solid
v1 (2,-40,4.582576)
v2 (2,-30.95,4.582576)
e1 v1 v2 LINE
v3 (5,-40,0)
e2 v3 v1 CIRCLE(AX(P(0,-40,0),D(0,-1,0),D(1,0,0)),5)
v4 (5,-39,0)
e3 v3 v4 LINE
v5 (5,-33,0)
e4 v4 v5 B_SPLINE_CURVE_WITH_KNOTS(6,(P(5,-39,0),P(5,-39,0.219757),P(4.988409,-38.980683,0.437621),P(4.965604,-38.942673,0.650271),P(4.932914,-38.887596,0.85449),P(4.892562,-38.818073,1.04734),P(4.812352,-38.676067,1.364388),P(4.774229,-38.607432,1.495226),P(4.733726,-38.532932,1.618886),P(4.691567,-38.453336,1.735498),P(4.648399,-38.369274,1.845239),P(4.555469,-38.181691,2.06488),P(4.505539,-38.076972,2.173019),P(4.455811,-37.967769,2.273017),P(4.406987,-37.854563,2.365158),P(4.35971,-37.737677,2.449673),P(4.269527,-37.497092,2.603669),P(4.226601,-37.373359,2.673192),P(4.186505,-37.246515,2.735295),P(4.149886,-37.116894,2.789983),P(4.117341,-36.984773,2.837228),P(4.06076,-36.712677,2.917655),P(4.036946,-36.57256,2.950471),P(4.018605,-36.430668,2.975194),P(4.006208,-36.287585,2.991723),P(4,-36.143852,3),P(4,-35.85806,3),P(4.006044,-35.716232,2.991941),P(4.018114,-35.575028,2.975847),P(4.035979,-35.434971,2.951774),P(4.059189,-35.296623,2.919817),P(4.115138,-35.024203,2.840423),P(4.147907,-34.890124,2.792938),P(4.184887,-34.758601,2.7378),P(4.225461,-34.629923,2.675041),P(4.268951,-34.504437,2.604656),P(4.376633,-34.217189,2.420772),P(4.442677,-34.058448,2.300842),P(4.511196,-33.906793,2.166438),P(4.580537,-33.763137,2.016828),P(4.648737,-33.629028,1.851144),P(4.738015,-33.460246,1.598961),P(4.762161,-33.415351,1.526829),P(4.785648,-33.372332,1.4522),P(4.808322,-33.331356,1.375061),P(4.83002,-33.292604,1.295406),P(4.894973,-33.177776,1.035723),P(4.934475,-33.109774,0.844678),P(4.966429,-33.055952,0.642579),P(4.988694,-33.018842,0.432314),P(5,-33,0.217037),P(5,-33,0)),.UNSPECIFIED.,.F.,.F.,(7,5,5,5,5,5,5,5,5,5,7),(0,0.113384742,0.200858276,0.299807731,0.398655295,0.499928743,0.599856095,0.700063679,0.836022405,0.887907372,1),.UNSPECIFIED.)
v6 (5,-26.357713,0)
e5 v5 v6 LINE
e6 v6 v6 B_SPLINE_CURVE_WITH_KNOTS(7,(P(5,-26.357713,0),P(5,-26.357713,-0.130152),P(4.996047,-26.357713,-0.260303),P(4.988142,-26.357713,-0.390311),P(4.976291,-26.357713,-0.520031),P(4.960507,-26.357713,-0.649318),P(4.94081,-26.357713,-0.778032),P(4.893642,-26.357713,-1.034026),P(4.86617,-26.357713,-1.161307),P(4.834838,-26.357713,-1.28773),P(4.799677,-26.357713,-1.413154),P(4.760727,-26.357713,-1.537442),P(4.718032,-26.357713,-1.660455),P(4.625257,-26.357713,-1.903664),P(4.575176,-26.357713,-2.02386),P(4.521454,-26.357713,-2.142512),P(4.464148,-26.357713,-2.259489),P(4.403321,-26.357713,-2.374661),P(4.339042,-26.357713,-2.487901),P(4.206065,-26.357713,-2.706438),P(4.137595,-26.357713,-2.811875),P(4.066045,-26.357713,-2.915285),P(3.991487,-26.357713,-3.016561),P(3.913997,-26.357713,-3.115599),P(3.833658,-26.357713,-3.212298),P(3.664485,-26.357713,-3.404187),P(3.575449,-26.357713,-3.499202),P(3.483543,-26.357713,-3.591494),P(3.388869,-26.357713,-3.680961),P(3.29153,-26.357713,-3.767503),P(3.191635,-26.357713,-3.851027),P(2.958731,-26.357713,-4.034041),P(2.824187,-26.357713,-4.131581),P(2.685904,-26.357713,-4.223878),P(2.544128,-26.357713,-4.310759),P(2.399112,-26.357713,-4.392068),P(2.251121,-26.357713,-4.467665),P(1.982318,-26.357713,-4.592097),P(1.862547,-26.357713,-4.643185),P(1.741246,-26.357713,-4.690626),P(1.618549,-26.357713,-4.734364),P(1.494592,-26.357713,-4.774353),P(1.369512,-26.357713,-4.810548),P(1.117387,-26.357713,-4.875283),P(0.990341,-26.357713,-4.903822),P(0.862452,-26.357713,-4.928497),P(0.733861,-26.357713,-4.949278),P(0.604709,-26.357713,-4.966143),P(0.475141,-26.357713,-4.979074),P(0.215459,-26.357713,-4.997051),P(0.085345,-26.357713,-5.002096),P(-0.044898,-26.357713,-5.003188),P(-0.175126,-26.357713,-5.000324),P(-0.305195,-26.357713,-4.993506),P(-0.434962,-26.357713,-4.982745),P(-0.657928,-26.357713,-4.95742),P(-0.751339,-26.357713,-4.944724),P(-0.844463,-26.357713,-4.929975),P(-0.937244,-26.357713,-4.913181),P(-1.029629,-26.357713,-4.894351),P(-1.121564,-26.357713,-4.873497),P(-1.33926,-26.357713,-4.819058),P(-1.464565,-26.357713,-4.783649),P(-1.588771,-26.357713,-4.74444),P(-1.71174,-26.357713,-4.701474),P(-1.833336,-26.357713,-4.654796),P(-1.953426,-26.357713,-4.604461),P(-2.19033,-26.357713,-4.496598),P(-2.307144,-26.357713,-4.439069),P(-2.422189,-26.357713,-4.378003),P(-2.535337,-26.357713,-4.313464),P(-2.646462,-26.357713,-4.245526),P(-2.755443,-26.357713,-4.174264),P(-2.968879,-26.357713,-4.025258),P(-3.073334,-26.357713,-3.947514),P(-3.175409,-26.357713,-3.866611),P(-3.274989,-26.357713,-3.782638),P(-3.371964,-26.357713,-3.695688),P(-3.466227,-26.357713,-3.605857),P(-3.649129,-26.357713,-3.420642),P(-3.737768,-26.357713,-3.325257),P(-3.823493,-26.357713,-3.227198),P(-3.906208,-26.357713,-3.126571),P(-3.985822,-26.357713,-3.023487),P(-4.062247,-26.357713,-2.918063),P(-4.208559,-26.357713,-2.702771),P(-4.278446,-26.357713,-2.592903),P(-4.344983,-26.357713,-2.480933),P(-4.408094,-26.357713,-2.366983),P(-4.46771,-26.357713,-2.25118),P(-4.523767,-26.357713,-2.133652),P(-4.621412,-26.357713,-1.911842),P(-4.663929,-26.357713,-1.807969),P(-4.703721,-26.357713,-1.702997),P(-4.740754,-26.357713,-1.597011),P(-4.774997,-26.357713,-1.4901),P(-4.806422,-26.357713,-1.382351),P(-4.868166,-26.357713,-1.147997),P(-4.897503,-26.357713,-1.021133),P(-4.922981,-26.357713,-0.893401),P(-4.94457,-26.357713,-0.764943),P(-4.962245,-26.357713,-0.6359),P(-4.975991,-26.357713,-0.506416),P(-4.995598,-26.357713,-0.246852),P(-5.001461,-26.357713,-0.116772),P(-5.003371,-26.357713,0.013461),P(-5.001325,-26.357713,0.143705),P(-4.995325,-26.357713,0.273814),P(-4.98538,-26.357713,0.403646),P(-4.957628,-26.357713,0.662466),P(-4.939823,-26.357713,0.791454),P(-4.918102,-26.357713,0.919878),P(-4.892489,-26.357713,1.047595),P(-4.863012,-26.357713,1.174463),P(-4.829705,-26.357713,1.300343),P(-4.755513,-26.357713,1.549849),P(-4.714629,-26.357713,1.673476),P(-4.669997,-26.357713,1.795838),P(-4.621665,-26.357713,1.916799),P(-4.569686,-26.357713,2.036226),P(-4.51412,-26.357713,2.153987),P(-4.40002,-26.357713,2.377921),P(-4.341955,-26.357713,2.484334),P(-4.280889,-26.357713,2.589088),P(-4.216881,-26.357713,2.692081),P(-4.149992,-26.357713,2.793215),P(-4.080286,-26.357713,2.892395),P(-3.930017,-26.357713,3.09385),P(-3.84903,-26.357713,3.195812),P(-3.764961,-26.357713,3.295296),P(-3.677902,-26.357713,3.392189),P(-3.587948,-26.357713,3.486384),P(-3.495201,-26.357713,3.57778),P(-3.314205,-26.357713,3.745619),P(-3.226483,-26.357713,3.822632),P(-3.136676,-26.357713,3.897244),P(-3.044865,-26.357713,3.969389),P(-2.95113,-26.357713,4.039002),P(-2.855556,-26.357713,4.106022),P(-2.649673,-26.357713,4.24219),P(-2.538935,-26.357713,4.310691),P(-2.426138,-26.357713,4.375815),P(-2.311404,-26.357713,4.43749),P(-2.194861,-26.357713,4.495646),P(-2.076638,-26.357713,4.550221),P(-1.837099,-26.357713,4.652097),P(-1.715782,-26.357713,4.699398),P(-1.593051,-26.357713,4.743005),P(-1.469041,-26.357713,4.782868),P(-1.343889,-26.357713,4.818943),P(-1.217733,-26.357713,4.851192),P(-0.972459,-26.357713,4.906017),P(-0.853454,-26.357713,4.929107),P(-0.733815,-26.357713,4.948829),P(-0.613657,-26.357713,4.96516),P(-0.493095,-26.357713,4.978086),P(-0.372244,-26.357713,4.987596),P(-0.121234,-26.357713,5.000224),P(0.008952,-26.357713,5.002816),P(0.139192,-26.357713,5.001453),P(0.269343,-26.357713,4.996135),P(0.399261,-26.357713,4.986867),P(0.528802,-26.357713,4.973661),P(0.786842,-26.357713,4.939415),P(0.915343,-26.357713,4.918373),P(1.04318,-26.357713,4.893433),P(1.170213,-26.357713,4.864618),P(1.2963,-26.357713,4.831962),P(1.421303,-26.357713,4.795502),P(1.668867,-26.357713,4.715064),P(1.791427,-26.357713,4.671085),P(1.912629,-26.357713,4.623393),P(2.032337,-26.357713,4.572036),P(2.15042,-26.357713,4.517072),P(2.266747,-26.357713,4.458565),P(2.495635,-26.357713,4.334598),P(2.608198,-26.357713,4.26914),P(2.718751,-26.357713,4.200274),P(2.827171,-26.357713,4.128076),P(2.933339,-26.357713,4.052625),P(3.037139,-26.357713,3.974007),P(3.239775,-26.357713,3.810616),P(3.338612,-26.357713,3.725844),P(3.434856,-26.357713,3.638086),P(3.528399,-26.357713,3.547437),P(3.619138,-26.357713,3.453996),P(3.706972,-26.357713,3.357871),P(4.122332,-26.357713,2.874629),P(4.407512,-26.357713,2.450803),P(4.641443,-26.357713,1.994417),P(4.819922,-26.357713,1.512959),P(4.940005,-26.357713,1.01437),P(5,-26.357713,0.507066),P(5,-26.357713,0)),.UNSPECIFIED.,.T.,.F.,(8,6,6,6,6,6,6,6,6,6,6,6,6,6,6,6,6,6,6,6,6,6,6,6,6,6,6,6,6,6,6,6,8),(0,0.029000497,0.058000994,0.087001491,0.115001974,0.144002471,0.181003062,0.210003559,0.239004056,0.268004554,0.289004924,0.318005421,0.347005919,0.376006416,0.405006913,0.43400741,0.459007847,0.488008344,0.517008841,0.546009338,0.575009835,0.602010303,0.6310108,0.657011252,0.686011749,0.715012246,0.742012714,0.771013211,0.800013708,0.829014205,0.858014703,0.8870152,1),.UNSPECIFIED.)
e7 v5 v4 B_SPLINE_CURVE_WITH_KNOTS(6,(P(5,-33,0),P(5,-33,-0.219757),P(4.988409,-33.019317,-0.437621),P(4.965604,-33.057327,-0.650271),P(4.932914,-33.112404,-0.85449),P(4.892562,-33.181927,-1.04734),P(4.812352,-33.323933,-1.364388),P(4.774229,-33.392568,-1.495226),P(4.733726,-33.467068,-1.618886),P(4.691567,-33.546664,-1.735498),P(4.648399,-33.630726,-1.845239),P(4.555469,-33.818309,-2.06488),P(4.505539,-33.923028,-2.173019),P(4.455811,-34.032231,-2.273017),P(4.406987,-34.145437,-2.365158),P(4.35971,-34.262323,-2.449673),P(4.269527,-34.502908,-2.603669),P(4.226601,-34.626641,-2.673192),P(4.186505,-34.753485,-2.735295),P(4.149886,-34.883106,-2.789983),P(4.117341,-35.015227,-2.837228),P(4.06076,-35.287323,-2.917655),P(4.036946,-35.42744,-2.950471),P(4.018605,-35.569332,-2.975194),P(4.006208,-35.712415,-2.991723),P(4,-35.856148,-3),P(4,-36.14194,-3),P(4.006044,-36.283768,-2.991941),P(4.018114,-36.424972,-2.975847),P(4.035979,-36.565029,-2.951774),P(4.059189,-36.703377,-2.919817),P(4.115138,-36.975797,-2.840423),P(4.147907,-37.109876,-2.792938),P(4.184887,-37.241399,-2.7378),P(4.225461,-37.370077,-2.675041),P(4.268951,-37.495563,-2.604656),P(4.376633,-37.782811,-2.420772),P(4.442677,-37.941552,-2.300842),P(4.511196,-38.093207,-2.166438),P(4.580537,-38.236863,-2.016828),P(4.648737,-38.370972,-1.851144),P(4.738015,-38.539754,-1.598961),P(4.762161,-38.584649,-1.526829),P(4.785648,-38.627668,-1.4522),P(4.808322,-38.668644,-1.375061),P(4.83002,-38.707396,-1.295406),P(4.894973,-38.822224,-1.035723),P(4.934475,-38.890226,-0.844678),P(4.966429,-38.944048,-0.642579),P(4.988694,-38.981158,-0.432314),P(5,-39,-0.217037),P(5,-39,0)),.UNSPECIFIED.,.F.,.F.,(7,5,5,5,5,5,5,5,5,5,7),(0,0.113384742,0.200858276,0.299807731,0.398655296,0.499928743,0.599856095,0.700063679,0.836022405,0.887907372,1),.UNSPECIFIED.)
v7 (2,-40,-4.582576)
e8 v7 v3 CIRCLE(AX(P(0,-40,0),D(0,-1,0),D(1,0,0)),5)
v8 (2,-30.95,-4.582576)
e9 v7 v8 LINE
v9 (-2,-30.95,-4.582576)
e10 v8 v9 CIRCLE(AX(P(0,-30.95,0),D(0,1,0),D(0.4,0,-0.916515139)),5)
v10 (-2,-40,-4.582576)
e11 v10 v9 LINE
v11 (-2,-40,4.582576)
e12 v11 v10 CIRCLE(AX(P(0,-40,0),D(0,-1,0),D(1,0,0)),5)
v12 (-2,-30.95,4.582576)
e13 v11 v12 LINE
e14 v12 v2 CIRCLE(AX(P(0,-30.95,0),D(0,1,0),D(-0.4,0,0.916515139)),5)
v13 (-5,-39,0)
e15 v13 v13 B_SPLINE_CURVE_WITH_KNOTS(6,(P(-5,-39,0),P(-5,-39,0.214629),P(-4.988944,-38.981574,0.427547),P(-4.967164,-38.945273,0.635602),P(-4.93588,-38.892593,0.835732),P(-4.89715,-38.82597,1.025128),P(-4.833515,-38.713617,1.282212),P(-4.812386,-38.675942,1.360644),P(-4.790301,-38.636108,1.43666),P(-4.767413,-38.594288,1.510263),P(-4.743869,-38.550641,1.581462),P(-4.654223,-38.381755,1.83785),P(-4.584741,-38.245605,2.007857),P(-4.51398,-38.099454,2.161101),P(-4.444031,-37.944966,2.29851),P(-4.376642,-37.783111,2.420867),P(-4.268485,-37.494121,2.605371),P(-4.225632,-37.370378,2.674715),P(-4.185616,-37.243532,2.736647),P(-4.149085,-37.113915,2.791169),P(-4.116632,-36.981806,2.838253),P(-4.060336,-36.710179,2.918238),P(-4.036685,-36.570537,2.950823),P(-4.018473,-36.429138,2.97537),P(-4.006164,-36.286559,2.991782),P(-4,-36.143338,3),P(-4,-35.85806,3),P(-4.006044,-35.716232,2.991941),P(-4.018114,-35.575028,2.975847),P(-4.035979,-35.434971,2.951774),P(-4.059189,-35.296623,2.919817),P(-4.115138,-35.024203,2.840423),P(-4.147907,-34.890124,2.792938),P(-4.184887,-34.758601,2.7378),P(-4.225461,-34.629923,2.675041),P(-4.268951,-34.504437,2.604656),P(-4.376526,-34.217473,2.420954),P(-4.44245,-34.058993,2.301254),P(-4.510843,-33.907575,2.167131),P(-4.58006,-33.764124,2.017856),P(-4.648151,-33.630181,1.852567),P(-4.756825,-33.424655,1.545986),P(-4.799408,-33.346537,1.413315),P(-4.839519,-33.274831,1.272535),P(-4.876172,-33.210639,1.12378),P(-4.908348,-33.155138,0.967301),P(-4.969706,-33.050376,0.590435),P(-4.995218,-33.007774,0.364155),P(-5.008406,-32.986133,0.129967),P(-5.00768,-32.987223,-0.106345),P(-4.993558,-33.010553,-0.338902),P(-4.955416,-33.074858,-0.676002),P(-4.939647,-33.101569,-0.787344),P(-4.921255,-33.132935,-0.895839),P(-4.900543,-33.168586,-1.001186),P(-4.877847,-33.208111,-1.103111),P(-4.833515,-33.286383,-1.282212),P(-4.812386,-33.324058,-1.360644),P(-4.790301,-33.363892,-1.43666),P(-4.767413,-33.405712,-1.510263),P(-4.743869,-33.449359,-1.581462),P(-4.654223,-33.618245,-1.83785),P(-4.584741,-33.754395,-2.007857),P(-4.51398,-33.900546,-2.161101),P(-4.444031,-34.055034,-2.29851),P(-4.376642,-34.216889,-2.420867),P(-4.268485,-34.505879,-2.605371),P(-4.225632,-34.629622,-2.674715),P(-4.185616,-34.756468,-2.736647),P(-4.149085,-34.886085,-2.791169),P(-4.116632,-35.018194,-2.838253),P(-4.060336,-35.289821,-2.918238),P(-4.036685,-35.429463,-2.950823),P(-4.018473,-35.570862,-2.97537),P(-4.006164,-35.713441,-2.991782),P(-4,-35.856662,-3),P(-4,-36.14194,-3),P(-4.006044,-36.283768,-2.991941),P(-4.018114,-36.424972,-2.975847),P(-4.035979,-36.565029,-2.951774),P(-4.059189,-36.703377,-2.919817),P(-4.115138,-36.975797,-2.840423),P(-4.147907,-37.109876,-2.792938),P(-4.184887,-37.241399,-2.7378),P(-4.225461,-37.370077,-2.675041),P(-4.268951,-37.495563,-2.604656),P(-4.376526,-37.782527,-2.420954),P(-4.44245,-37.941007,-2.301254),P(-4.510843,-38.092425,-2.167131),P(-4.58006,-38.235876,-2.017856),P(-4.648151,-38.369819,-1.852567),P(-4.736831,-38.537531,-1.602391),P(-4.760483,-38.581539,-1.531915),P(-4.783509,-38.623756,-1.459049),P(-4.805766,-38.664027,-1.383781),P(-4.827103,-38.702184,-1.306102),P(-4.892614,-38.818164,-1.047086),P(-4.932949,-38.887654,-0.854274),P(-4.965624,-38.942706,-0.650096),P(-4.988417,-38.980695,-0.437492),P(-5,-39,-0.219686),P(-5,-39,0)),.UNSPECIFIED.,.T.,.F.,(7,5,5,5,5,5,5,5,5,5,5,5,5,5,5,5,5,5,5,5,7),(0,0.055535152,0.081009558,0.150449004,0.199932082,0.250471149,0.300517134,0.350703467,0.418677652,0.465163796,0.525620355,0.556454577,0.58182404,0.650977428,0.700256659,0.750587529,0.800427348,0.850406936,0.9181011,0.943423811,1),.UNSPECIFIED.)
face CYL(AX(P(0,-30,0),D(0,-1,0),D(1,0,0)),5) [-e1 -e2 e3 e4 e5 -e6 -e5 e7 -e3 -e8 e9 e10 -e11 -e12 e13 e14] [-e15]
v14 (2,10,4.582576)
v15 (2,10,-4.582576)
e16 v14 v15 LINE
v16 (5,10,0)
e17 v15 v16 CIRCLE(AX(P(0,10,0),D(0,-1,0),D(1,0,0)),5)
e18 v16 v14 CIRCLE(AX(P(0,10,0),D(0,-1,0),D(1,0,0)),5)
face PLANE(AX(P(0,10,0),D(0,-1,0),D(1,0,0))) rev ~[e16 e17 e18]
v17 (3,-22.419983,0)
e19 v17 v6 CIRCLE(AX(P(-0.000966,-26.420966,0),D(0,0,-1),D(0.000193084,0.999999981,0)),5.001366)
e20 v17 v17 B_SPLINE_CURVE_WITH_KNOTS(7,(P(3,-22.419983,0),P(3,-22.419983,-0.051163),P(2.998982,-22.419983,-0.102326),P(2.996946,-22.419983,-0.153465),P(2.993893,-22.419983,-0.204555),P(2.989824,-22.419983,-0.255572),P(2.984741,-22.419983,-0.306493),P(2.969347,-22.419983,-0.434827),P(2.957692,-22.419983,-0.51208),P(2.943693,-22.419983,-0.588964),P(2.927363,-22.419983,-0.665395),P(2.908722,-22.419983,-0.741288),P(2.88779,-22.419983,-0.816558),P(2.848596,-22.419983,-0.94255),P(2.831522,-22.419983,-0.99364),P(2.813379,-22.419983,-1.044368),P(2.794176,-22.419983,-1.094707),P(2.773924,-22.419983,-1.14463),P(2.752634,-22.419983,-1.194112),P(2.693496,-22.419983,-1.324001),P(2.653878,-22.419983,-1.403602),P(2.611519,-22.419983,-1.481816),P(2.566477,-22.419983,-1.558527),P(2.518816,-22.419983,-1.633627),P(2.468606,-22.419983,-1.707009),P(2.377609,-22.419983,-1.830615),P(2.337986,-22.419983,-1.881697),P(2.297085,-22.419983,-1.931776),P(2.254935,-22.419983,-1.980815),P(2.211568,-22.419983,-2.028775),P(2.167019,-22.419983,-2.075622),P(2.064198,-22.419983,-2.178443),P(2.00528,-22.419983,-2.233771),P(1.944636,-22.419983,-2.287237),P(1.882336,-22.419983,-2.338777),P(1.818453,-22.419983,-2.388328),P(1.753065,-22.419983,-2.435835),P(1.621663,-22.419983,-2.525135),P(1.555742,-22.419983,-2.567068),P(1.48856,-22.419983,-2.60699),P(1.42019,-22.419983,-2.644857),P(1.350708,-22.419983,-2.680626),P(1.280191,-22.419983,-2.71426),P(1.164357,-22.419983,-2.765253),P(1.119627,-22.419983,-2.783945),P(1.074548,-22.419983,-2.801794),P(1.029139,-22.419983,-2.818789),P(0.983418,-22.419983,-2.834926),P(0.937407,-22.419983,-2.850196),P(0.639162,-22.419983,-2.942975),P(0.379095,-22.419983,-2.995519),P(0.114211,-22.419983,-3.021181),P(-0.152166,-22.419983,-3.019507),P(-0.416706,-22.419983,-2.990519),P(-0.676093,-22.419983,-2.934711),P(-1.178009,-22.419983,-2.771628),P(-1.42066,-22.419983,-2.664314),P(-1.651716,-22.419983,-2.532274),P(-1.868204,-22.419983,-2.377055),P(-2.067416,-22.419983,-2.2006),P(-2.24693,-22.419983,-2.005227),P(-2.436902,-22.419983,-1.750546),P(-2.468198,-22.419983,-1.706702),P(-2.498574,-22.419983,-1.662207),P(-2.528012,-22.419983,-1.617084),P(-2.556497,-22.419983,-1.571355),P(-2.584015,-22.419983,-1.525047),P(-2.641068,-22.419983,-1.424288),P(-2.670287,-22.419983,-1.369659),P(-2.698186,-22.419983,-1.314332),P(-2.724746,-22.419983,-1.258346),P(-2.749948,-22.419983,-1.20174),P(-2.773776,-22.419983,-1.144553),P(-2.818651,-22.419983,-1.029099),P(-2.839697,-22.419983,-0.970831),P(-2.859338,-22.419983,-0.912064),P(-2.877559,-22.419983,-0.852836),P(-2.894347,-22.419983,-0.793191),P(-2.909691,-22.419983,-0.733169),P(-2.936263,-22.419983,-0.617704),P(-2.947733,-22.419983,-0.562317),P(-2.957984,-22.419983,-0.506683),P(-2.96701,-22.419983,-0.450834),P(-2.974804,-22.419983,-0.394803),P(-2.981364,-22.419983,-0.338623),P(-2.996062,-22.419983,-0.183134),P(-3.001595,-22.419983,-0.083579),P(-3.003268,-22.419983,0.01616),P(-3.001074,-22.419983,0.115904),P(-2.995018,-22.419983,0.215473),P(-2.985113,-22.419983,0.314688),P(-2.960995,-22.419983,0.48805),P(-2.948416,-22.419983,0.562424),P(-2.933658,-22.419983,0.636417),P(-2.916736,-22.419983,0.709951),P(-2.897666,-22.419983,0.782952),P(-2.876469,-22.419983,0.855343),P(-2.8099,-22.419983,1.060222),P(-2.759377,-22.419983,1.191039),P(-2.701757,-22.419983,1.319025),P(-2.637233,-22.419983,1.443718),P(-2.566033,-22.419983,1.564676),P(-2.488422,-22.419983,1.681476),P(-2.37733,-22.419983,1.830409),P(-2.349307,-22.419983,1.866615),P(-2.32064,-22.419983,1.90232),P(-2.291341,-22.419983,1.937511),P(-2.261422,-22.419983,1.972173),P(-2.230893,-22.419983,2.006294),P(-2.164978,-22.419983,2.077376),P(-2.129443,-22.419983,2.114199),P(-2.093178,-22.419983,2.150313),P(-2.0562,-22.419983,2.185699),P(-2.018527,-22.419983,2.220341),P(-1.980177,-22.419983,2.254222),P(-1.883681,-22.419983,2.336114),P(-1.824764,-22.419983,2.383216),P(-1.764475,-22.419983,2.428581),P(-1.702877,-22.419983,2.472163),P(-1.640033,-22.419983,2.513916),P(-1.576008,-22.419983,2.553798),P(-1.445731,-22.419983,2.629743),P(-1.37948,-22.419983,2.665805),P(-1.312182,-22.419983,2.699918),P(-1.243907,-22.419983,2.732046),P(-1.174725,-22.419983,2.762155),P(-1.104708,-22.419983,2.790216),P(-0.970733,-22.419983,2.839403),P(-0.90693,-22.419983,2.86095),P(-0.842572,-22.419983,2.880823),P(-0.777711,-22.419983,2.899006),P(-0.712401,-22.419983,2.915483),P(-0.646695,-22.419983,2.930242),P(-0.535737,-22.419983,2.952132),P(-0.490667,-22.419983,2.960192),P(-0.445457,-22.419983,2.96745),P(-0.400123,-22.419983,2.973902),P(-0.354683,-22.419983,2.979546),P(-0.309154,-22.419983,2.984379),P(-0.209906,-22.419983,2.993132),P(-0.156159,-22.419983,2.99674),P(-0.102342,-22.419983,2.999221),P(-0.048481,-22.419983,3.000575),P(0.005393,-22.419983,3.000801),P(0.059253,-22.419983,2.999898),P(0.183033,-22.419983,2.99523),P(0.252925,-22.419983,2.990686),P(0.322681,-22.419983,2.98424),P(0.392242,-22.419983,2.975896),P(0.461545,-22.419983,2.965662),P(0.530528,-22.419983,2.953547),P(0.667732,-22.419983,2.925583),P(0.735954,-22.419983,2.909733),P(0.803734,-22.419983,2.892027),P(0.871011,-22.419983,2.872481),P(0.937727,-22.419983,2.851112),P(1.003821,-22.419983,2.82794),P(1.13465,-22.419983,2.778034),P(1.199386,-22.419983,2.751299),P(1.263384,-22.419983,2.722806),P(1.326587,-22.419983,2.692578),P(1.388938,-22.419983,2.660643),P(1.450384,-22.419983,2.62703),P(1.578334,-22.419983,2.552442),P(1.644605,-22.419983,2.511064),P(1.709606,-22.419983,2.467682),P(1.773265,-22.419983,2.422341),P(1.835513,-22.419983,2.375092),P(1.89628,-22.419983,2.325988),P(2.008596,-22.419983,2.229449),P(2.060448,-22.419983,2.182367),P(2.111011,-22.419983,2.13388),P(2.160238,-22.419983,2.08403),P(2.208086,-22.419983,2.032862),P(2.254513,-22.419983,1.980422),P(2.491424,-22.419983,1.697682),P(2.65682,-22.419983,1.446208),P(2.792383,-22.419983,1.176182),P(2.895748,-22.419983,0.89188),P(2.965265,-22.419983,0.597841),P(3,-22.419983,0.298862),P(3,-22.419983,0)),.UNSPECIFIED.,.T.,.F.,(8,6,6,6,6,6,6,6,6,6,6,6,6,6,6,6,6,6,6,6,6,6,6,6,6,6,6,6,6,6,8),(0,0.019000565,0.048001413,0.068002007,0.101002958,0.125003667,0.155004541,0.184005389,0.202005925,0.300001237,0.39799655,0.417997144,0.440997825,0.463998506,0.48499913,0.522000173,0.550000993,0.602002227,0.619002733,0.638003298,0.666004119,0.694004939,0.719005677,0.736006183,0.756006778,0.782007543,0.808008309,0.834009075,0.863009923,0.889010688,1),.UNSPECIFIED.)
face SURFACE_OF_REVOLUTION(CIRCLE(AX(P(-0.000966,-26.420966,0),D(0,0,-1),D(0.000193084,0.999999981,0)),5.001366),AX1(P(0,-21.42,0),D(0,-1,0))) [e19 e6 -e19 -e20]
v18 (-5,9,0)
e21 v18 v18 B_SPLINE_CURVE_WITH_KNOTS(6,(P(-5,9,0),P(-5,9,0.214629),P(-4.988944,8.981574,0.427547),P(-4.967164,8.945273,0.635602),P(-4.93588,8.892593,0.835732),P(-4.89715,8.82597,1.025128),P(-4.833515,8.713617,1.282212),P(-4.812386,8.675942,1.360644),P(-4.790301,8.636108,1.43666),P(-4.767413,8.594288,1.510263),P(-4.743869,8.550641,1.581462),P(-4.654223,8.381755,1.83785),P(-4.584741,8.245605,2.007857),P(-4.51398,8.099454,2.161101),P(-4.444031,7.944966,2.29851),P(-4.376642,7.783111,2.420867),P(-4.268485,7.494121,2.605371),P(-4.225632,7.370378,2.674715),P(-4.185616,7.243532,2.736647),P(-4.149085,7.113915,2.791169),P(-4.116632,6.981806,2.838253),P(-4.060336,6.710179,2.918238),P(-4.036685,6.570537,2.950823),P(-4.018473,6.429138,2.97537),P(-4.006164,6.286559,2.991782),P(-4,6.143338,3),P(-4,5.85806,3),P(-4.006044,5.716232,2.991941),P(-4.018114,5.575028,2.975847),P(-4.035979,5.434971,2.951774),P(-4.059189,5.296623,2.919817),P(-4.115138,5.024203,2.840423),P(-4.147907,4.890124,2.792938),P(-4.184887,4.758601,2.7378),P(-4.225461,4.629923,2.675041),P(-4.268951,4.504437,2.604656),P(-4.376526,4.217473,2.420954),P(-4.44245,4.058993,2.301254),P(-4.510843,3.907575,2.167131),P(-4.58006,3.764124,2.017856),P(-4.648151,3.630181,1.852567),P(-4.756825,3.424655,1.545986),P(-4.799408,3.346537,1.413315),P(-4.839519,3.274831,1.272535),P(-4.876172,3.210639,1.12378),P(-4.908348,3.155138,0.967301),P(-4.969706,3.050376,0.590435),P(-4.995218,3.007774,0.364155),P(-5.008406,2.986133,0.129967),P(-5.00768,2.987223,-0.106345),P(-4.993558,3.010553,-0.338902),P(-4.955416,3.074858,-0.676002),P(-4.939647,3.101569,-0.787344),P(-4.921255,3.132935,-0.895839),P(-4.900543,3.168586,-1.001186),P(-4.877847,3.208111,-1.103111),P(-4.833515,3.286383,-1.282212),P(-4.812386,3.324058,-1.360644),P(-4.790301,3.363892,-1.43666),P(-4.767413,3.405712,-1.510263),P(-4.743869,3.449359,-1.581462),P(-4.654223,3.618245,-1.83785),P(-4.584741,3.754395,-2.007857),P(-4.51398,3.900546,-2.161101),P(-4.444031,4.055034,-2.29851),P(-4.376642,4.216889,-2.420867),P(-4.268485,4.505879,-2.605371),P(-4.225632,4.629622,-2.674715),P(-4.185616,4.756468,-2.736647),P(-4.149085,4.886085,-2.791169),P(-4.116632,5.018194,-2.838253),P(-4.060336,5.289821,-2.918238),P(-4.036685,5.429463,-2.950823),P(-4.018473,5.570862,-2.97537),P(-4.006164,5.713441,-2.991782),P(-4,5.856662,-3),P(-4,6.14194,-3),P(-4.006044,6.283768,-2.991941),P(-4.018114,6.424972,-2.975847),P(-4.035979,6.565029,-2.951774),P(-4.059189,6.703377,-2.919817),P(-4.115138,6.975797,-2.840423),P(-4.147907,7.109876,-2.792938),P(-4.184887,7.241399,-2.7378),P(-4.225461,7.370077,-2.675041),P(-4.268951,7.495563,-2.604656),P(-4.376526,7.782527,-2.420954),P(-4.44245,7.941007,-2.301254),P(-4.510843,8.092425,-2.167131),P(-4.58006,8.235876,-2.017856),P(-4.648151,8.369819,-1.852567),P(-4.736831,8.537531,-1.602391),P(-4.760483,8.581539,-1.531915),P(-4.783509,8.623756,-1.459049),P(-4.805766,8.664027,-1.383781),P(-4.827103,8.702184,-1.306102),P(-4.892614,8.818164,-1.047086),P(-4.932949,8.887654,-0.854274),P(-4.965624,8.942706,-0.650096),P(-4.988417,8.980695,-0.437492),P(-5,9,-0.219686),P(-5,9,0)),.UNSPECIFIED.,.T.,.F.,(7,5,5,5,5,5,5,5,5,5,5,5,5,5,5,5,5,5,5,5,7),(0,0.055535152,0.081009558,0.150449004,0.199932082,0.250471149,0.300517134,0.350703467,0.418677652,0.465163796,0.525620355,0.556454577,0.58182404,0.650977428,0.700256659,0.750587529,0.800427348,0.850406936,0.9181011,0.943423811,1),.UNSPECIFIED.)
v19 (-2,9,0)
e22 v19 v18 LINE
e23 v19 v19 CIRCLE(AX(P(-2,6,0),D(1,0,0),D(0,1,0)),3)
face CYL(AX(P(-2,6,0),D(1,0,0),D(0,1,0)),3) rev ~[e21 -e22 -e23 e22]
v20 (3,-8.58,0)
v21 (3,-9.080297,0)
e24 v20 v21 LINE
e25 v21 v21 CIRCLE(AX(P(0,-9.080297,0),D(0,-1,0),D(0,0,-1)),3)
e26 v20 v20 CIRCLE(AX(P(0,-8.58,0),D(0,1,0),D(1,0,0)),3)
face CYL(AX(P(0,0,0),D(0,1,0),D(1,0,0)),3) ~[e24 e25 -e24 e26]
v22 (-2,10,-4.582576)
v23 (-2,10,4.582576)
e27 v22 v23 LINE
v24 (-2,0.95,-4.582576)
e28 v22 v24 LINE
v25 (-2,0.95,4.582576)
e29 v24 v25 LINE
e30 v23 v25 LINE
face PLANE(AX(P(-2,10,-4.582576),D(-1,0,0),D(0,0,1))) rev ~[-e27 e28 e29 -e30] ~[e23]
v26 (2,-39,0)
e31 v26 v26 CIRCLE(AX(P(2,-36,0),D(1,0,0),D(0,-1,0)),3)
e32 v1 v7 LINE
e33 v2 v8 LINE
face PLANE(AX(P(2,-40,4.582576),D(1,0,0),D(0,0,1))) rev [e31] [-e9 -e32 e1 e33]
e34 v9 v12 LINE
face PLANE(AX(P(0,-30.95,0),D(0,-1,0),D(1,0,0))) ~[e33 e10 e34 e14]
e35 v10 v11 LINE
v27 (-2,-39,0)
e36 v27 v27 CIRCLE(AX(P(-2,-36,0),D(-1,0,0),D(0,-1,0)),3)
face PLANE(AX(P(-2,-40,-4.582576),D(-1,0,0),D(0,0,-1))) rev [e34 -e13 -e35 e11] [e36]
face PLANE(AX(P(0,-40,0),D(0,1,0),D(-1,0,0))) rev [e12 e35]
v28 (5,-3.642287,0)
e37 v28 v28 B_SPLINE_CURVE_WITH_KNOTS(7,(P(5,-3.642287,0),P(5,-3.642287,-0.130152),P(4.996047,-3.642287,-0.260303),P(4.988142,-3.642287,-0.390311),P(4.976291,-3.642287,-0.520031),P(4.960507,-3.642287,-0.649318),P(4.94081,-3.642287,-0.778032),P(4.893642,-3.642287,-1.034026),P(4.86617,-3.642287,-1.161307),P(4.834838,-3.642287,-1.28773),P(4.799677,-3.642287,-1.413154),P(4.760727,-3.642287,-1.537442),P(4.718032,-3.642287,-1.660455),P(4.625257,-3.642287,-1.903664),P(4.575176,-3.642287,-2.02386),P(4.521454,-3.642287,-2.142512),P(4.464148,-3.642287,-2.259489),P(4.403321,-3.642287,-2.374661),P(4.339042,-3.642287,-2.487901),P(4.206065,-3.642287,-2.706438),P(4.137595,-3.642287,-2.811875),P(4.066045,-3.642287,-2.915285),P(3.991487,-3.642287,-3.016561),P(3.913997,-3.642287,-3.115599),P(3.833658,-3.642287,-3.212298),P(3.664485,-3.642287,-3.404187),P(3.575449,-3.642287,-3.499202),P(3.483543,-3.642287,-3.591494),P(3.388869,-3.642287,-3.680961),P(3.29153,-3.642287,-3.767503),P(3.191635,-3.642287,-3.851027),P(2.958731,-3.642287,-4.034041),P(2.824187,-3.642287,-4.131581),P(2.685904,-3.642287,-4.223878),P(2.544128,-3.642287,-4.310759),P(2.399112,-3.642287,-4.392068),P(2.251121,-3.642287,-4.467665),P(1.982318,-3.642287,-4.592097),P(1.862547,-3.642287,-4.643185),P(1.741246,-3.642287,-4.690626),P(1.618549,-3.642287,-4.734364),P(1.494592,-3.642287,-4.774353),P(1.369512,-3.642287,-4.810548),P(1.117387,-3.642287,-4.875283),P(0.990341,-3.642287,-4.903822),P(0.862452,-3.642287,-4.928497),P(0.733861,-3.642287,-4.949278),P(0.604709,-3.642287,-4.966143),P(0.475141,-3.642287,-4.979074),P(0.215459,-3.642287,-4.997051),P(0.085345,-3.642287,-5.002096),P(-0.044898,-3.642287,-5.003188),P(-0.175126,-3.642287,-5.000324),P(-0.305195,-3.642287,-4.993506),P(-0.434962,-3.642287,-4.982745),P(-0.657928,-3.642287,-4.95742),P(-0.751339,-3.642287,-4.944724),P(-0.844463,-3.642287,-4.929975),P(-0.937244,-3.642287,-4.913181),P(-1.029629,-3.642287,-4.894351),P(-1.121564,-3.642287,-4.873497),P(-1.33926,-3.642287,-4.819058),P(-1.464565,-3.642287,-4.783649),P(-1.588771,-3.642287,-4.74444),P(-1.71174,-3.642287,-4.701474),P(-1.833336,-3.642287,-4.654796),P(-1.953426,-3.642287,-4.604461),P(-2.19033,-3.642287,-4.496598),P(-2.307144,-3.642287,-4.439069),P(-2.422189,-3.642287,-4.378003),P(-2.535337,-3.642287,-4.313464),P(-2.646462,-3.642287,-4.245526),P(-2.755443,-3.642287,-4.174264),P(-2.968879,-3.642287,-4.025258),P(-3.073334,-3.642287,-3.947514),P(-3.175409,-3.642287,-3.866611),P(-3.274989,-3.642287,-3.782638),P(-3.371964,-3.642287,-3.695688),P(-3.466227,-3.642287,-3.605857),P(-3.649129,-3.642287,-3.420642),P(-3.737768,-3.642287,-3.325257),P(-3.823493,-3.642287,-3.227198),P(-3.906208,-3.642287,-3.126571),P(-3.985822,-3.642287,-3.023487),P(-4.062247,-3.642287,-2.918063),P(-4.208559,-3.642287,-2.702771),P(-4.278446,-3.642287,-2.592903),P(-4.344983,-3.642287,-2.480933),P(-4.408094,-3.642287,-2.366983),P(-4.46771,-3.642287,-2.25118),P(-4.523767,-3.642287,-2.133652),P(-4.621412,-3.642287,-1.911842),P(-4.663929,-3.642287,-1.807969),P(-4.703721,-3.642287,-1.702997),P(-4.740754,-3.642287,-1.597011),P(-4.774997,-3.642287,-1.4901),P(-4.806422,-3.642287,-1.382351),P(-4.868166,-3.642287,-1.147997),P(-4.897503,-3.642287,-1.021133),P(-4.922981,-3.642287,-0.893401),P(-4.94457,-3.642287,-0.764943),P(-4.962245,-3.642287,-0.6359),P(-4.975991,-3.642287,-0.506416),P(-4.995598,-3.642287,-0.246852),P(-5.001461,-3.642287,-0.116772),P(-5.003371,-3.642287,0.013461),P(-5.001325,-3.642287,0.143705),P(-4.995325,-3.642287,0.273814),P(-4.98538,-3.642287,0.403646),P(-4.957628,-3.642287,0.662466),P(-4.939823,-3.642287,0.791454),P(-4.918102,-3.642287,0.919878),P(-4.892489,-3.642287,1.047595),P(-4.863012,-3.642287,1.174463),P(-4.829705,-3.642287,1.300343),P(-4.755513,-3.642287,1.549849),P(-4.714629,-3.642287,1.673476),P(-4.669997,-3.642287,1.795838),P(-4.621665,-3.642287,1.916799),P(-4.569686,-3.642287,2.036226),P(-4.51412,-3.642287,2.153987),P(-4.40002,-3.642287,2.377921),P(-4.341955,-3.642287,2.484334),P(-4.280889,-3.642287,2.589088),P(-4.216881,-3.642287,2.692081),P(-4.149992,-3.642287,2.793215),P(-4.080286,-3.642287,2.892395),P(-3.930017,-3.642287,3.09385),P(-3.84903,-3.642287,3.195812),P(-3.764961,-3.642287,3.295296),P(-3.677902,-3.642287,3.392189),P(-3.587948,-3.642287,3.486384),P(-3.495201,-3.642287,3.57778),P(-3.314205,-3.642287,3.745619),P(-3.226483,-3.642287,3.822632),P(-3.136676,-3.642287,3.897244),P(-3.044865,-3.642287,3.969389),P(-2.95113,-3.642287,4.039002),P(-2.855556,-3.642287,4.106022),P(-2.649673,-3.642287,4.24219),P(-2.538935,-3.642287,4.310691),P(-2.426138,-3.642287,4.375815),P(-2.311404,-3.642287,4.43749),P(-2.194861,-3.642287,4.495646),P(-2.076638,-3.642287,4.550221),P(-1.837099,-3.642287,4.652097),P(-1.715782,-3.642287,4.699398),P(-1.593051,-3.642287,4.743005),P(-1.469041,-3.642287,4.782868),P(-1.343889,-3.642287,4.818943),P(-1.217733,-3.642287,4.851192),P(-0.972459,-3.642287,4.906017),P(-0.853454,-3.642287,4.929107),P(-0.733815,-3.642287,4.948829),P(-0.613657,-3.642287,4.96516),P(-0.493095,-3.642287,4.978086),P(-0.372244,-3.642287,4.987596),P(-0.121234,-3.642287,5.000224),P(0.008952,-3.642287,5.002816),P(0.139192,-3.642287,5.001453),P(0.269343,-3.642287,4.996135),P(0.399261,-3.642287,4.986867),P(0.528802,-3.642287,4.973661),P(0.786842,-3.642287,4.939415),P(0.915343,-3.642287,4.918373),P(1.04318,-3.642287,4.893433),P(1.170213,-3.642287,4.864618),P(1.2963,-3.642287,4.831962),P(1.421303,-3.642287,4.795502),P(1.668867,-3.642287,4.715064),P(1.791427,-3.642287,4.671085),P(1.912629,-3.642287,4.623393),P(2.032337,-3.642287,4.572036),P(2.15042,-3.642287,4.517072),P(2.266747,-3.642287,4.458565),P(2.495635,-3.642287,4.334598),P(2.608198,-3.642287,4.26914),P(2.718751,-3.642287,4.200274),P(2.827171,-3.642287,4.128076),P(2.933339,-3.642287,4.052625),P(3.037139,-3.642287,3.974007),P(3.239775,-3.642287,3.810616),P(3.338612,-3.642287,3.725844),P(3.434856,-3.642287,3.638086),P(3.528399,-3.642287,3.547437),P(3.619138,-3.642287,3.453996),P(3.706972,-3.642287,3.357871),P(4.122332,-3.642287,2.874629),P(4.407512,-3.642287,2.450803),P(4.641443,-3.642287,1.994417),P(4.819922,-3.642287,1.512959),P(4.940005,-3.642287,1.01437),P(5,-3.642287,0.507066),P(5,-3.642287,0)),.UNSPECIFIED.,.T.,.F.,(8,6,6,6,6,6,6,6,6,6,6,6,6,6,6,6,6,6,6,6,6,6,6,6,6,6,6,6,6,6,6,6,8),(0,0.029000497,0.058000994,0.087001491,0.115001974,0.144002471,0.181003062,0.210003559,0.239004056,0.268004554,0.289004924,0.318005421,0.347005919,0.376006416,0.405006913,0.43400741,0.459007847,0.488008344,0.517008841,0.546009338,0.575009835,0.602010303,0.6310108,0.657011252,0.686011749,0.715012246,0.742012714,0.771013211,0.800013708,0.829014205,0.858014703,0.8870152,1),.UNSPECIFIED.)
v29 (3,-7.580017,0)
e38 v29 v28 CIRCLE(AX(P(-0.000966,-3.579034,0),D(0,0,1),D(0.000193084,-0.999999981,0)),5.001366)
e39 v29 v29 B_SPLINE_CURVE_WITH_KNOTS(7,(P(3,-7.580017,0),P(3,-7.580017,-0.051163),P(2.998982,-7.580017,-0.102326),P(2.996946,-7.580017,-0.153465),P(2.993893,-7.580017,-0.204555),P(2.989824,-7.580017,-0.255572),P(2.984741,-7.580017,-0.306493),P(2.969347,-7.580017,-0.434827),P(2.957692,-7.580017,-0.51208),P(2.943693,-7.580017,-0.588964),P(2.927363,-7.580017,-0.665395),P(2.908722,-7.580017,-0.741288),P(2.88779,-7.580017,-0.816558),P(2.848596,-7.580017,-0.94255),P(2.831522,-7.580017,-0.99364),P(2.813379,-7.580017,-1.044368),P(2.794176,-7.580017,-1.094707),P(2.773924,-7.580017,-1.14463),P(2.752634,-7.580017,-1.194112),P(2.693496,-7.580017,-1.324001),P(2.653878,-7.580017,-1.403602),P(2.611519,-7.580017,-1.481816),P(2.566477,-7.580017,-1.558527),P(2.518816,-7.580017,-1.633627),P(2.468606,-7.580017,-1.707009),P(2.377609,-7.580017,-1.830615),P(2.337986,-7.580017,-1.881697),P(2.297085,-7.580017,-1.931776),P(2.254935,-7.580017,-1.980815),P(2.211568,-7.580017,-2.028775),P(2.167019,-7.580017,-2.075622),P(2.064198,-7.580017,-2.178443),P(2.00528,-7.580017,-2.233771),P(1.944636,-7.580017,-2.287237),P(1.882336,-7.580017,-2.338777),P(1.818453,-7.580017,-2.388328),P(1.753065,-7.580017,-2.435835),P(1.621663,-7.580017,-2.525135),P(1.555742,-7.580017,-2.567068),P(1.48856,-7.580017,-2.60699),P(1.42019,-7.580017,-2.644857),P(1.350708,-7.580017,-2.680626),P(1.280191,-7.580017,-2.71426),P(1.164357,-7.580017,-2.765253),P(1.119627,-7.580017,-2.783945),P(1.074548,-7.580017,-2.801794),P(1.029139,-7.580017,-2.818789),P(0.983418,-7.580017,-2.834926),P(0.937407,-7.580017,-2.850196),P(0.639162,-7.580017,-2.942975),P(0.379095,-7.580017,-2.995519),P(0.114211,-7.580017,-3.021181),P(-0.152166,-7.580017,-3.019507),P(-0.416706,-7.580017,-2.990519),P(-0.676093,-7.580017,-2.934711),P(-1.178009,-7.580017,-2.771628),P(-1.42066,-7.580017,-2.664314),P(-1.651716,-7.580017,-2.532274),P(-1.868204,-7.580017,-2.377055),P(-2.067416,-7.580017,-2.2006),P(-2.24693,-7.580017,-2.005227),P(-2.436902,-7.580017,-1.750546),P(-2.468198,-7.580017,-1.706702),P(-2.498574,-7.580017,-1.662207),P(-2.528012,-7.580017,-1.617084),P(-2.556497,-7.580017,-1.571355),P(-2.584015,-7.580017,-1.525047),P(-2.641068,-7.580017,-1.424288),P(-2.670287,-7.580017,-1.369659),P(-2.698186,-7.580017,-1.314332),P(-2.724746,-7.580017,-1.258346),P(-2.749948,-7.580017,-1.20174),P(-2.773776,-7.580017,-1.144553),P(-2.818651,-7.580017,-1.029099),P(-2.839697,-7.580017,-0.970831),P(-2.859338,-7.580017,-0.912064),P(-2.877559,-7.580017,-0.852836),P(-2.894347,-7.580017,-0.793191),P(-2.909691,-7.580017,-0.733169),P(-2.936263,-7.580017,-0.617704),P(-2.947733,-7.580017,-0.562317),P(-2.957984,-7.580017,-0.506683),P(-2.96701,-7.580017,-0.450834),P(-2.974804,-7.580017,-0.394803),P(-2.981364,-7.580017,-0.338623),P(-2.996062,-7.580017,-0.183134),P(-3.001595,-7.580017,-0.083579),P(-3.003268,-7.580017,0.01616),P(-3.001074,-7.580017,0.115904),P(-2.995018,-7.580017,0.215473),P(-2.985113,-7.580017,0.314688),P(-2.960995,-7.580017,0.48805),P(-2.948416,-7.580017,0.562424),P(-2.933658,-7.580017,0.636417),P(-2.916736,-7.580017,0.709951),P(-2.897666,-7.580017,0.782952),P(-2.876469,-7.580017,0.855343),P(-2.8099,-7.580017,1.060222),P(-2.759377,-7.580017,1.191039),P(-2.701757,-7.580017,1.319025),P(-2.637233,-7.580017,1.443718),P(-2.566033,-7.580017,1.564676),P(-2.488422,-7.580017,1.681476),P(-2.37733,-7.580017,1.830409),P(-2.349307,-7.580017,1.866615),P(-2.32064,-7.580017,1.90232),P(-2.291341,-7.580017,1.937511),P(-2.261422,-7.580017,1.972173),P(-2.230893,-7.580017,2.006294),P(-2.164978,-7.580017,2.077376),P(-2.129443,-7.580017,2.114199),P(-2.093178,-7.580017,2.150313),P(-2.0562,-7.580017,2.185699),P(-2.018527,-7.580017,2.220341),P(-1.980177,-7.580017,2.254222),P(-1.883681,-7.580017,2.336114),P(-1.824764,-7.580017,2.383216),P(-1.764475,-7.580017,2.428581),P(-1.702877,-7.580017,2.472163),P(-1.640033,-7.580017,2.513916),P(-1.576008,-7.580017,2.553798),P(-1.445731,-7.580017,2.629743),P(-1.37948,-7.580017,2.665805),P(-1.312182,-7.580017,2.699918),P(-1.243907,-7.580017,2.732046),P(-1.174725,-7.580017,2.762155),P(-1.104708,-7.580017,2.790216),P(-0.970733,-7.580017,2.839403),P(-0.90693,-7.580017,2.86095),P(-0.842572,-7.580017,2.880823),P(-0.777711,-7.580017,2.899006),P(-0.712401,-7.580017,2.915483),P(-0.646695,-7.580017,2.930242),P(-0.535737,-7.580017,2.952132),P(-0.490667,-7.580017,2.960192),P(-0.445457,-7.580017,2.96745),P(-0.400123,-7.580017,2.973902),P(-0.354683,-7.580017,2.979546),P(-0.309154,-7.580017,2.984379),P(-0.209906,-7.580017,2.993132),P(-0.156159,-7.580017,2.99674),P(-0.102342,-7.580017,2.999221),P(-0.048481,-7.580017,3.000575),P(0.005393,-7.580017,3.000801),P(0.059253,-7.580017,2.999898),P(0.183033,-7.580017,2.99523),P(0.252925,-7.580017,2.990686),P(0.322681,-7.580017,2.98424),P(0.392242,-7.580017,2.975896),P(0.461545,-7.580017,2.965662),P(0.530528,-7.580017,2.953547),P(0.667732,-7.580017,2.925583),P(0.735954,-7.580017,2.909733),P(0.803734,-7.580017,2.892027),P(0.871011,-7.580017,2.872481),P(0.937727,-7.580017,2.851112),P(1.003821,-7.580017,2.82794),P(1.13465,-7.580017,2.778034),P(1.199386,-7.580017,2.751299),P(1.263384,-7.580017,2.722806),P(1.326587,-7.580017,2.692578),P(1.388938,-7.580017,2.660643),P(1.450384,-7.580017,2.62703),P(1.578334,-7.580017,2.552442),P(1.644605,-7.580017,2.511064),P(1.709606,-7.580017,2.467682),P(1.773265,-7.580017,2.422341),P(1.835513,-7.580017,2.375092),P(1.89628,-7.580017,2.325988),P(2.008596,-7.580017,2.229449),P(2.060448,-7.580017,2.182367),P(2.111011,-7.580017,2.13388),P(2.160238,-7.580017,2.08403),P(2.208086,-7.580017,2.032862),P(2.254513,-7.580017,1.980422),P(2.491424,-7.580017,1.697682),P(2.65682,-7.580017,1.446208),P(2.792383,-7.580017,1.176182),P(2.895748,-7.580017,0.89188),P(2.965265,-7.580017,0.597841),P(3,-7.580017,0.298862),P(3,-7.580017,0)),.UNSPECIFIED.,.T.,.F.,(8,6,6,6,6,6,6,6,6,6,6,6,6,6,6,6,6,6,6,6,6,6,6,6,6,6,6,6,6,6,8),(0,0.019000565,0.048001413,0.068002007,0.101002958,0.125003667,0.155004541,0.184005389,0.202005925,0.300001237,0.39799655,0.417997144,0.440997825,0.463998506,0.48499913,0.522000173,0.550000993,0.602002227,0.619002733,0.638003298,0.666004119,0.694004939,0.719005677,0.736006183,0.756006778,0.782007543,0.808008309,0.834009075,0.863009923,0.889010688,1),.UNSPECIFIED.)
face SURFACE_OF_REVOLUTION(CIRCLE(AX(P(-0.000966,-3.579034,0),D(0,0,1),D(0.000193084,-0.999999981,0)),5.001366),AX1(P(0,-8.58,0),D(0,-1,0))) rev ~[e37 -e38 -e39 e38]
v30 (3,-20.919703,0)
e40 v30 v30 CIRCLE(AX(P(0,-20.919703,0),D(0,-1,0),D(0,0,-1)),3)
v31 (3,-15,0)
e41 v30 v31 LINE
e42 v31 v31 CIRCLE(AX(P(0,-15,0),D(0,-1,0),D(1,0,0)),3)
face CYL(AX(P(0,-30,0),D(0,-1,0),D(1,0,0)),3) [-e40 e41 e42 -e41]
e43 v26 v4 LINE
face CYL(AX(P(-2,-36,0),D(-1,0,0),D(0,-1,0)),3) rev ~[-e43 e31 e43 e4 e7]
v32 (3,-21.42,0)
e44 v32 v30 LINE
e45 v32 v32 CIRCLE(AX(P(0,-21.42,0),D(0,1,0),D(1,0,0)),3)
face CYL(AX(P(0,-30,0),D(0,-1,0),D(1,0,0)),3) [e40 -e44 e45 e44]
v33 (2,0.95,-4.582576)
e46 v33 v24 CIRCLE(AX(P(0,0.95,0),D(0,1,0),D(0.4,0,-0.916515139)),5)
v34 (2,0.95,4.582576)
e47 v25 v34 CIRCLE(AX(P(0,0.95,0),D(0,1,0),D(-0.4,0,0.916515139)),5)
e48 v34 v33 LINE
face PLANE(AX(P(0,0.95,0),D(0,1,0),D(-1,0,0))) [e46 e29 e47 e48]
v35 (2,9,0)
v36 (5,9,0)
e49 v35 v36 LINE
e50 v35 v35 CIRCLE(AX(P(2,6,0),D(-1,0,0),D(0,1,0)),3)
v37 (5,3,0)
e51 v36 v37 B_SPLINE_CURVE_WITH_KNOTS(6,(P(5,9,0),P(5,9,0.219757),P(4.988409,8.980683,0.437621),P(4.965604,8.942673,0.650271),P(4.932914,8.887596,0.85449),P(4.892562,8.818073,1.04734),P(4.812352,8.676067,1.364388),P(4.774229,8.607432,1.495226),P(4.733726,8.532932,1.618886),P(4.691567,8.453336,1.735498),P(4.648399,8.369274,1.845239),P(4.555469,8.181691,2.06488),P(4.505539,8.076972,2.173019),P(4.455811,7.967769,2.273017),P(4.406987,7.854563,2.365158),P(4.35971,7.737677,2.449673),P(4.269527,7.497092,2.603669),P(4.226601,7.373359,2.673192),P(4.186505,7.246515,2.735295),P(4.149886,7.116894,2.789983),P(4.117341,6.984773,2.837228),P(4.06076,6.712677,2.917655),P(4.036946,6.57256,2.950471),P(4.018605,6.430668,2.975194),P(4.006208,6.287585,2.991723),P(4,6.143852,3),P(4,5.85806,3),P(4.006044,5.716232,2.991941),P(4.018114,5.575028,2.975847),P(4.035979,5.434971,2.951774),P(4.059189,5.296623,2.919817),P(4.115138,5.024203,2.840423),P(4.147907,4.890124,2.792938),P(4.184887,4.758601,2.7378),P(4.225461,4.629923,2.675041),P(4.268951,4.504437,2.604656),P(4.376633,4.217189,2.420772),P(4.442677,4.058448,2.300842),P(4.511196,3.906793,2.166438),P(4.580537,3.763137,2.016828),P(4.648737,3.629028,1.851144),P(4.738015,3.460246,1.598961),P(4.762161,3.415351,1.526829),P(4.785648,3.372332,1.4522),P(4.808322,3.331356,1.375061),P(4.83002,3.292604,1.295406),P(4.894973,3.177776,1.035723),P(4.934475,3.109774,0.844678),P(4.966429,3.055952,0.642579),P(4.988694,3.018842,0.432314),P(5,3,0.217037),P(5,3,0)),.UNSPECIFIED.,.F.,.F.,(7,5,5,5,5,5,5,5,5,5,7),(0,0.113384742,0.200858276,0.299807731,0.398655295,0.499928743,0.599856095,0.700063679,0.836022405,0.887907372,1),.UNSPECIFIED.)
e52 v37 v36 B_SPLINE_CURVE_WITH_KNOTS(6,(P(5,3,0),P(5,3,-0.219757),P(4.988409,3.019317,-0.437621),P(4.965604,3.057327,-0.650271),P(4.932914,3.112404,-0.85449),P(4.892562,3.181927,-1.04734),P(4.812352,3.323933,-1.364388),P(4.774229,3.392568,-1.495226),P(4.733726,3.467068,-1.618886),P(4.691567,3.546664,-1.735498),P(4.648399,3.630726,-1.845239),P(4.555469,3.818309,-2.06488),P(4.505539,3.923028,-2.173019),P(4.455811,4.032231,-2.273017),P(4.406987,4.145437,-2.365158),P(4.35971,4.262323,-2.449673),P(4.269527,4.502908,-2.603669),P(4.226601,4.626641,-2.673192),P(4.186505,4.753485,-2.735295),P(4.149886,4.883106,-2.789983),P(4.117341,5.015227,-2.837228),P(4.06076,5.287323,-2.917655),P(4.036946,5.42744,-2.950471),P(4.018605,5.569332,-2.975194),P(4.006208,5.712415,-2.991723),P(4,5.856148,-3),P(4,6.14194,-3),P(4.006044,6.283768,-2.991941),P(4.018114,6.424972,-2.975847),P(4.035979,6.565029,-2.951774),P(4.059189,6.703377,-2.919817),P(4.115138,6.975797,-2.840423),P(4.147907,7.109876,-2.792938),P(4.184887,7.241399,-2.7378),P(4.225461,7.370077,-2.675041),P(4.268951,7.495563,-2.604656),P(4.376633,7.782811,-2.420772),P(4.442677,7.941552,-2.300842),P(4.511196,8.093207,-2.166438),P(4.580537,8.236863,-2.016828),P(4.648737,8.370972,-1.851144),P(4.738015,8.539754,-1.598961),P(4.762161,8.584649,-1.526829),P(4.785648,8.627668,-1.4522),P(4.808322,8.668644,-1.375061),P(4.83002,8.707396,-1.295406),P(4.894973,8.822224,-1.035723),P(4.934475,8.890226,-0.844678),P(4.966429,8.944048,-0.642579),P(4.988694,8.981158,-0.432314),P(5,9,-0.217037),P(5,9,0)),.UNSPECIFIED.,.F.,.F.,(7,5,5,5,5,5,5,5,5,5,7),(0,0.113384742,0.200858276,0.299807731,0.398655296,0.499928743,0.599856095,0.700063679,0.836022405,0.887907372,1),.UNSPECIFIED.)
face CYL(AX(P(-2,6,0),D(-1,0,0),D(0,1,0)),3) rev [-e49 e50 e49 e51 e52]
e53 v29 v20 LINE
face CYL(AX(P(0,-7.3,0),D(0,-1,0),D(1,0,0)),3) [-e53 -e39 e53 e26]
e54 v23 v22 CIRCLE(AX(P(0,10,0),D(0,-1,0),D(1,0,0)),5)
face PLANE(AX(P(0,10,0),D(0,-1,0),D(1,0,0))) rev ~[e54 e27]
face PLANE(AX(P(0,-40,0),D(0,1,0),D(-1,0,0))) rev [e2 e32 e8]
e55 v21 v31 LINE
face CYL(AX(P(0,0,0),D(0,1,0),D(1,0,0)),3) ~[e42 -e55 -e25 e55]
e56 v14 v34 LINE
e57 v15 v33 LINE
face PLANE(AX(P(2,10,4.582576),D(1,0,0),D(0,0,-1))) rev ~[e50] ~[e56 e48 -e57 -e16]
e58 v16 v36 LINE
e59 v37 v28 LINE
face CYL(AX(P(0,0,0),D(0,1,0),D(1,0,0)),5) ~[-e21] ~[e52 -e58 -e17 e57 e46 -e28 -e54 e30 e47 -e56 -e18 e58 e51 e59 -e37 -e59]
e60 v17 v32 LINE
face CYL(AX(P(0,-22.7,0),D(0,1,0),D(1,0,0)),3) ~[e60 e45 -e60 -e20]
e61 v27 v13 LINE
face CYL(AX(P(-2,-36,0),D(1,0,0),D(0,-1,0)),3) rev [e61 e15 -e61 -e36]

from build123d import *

# Parameters (mm, degrees)
F1_R          = 3
F2_DEPTH      = 15
F1_R_2        = 5
F3_DEPTH      = 10
F3_DEPTH_BACK = 8.58
F4_S5_R       = 3
F4_T6_DEPTH   = 13095
F6_DEPTH      = 9.05
F7_R          = 3
F8_DEPTH      = 25
F8_DEPTH_BACK = 25


# Not quite as in the source:
# - a fillet or chamfer that OpenCascade refuses, or shapes differently, is made with other operations: its cross-section is extruded or revolved along the edge and cut away or added


with BuildPart() as f2:
    # F1 (on Front) → F2 (new body)
    with BuildSketch(Plane.XZ):
        Circle(F1_R)
    extrude(amount=F2_DEPTH)

    # F1 (on Front) → F3 (join, two sides)
    with BuildSketch(Plane.XZ) as f3_sk:
        Circle(F1_R_2)
        Circle(F1_R, mode=Mode.SUBTRACT)
        Circle(F1_R)
    extrude(amount=-F3_DEPTH)
    extrude(f3_sk.sketch, amount=F3_DEPTH_BACK)

    # F4: fillet of radius 5 on 1 edges, made by hand


with BuildPart() as f4_tool2:
    # F4_s3 → F4_t4 (revolve)
    with BuildSketch(Plane.XY):
        with BuildLine():
            ThreePointArc((0, -8.5803999068), (3.5358753108, -7.1151924681), (5.0004, -3.5790343146))
            Line((5.0004, -3.5790343146), (5.5005365685, -3.5790343146))
            ThreePointArc((5.5005365685, -3.5790343146), (5.5001365685, -6.0795171573), (5.5001365685, -8.58))
            Line((5.5001365685, -8.58), (5, -9.0801365685))
            Line((5, -9.0801365685), (0, -9.0805364913))
            Line((0, -9.0805364913), (0, -8.5803999068))
        make_face()
    revolve(axis=Axis((0, -8.58, 0), (0, -1, 0)))

    # F4_s5 → F4_t6 (cut, symmetric)
    with BuildSketch(Plane.XZ.offset(7.3)):
        Circle(F4_S5_R)
    extrude(amount=F4_T6_DEPTH, both=True, mode=Mode.SUBTRACT)


with BuildPart() as f2_1:
    add(f2.part)

    # F4_t1: cut F4_tool2
    add(f4_tool2.part, mode=Mode.SUBTRACT)

    # F5 (on face) → F6 (cut)
    with BuildSketch(Plane(origin=(0, 10, 0), x_dir=(-1, 0, 0), z_dir=(0, 1, 0))):
        with BuildLine():
            Line((-2, 4.582575695), (-2, -4.582575695))
            ThreePointArc((-2, -4.582575695), (0, -5), (2, -4.582575695))
            Line((2, -4.582575695), (2, 4.582575695))
            ThreePointArc((2, 4.582575695), (0, 5), (-2, 4.582575695))
        make_face()
    extrude(amount=-F6_DEPTH, mode=Mode.SUBTRACT)

    # F7 (on face) → F8 (cut, two sides)
    with BuildSketch(Plane.YZ.offset(-2)) as f8_sk:
        with Locations((6, 0)):
            Circle(F7_R)
    extrude(amount=F8_DEPTH, mode=Mode.SUBTRACT)
    extrude(f8_sk.sketch, amount=-F8_DEPTH_BACK, mode=Mode.SUBTRACT)

    # F9: F2 across face


with BuildPart() as f2_2:
    add(f2_1.part)
    add(f2_1.part.mirror(Plane.XZ.offset(15)))


solid = f2_2.part
